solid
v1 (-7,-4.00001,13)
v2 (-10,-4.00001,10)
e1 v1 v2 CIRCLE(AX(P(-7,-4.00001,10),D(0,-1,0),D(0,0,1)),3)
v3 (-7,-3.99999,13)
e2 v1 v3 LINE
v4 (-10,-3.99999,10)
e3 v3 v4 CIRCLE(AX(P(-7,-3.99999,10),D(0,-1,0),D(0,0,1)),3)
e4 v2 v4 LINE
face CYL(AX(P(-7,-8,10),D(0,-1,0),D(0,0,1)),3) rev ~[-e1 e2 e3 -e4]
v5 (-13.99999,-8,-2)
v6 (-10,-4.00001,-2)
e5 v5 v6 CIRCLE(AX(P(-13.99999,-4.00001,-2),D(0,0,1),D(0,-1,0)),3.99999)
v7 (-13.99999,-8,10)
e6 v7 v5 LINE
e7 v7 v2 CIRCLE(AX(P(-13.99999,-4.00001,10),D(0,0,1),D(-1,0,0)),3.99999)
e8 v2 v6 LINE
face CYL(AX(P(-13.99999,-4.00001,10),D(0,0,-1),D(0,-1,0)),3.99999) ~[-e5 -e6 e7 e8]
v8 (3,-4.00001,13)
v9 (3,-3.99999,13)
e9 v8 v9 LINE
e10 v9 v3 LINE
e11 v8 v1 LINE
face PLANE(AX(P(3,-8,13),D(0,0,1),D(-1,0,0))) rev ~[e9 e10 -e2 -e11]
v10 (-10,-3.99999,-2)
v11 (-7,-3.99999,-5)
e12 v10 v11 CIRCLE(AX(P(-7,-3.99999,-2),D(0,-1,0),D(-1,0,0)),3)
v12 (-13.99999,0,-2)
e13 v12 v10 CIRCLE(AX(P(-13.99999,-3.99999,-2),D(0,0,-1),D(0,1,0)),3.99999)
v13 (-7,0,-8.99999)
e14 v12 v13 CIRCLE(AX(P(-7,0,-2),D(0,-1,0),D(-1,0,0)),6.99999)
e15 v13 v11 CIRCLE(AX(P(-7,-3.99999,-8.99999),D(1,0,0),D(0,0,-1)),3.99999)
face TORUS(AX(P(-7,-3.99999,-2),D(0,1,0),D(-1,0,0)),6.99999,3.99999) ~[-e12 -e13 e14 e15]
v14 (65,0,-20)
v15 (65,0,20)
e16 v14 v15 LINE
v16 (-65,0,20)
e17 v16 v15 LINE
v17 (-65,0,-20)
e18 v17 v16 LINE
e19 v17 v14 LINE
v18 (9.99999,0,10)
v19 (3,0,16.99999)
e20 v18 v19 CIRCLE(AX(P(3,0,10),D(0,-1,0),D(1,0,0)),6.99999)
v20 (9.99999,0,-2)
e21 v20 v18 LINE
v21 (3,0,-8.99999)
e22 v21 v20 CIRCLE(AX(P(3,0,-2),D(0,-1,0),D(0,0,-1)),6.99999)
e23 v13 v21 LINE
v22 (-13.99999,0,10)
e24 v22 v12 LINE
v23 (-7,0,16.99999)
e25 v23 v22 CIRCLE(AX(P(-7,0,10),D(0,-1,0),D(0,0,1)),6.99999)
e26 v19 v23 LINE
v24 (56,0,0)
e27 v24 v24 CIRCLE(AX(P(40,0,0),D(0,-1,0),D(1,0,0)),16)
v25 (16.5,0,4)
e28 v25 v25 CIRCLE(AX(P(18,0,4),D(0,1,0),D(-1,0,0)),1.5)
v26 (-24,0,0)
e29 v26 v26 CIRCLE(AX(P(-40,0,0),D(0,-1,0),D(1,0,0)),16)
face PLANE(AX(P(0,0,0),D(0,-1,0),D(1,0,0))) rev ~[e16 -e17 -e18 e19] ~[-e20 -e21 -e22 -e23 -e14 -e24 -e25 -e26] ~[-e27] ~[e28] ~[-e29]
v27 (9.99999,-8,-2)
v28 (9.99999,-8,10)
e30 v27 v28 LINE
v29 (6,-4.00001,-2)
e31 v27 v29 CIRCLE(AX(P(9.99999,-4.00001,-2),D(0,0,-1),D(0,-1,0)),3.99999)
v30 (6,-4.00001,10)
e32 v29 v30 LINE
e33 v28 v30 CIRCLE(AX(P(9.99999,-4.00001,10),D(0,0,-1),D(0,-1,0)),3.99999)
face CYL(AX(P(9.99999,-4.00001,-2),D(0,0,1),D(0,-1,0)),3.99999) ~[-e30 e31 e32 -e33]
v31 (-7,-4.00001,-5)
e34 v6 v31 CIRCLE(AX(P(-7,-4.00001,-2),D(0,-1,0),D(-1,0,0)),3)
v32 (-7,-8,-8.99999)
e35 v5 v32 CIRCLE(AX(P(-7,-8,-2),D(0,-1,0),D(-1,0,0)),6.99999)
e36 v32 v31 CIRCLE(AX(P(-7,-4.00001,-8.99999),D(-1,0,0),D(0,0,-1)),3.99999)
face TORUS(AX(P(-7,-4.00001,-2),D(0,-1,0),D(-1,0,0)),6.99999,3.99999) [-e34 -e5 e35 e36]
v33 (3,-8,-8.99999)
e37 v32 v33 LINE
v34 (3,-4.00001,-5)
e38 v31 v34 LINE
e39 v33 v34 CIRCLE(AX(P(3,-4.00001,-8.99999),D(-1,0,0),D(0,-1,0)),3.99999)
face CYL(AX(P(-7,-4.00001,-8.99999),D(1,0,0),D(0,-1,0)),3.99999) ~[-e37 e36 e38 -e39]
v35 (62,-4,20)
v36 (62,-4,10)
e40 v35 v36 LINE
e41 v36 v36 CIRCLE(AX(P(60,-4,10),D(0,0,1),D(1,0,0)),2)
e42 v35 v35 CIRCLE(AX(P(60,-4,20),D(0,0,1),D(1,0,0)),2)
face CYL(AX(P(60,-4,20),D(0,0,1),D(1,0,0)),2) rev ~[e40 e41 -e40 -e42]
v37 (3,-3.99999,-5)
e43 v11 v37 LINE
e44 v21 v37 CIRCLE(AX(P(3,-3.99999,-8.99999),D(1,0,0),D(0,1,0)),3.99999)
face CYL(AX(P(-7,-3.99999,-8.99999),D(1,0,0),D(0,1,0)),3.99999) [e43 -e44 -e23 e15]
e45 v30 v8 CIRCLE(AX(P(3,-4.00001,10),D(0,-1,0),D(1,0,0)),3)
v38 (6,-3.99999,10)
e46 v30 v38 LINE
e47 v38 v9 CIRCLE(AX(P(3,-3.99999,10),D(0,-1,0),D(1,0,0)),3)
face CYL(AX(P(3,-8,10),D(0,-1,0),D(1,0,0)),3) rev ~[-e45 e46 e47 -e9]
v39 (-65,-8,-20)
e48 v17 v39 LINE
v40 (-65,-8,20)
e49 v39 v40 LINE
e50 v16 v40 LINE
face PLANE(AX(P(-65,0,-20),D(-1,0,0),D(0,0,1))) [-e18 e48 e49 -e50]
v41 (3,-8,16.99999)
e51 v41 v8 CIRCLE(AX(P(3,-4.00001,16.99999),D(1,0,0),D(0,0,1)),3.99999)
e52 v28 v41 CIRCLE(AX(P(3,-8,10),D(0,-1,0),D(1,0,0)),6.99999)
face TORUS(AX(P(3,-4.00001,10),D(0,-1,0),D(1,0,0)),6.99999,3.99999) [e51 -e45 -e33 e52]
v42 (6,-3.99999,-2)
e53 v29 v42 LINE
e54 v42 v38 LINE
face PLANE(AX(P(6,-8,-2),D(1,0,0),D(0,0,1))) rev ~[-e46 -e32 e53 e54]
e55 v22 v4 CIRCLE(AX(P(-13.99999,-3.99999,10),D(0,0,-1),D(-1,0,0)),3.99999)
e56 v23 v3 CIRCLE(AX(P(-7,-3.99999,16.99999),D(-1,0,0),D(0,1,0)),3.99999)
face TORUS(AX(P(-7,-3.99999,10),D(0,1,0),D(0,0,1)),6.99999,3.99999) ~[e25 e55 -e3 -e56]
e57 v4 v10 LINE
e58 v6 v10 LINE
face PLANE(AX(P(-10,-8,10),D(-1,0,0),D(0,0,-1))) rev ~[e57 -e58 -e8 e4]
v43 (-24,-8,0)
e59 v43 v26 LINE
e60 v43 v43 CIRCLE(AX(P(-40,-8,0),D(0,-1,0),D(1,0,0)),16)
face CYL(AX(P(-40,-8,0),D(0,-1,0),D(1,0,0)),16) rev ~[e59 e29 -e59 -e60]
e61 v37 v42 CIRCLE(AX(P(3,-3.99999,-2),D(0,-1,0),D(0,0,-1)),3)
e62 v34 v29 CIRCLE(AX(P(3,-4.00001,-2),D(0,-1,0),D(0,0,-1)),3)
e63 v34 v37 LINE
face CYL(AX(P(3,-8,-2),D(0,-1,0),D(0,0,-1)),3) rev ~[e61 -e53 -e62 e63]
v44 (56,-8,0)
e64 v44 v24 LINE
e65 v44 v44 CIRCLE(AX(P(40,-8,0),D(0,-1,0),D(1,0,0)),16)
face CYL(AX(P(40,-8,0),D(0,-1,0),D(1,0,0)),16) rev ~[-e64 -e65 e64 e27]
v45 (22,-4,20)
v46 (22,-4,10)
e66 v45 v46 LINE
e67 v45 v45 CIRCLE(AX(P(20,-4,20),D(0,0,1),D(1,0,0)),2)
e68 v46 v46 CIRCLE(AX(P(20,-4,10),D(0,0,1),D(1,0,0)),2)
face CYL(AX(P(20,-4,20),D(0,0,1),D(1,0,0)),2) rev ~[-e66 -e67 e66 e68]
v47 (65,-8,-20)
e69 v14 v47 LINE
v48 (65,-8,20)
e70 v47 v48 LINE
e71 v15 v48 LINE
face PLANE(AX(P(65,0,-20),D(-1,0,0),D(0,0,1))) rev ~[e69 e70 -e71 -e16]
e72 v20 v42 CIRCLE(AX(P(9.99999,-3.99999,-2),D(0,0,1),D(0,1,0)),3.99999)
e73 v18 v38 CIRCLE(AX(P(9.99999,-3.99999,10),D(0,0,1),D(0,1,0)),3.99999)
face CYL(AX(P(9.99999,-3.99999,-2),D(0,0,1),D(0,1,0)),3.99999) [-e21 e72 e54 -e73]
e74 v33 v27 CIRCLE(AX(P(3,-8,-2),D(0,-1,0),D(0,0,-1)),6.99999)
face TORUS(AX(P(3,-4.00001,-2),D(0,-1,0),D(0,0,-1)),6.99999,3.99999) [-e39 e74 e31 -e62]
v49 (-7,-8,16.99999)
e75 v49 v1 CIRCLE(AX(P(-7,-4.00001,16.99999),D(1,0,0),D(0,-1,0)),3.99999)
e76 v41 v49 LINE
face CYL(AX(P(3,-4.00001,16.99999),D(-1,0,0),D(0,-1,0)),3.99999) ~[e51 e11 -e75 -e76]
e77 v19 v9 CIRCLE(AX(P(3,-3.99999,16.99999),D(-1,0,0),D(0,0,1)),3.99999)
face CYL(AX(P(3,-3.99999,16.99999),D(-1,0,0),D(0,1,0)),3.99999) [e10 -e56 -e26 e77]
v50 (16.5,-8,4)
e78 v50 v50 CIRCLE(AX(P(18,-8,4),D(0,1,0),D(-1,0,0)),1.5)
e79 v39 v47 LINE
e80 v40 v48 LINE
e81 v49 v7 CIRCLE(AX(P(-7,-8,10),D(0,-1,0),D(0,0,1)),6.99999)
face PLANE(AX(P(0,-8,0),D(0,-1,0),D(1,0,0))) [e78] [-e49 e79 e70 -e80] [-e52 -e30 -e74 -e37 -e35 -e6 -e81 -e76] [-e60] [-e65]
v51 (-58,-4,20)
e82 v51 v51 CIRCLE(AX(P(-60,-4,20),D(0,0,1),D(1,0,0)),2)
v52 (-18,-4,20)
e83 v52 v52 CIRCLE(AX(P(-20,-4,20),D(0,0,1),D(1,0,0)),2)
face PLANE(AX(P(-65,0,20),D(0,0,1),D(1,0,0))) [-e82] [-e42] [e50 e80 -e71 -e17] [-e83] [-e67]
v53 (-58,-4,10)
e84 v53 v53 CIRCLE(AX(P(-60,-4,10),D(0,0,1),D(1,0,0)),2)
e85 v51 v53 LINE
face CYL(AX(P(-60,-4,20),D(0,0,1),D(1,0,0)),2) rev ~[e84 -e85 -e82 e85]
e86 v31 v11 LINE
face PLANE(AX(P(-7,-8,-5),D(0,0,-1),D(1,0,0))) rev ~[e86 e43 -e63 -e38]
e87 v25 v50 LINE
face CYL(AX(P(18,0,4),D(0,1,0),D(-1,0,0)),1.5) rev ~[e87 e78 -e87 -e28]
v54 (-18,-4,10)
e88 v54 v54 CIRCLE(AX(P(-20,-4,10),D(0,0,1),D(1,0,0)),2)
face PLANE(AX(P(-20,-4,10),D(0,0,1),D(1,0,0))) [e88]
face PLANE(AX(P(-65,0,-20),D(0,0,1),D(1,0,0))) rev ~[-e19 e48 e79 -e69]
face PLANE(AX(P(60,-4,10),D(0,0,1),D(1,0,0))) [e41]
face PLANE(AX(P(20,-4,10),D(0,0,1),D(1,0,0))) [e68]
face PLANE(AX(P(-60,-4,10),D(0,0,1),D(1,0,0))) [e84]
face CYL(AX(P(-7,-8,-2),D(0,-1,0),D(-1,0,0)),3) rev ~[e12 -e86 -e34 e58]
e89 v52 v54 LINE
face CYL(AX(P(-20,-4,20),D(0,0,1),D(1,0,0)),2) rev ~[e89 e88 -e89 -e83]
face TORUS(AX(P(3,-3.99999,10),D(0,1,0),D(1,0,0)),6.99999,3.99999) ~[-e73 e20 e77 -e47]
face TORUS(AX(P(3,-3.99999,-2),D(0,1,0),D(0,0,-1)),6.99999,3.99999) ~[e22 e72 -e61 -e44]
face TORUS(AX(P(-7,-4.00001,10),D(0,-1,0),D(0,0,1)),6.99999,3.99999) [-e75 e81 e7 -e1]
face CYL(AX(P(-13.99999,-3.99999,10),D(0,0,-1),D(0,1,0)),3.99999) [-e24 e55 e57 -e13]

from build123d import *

# Parameters (mm, degrees)
F0_W      = 130
F0_H      = 40
F1_DEPTH  = 8
F2_R      = 16
F3_DEPTH  = 8.001
F4_R      = 2
F5_DEPTH  = 10
F7_DEPTH  = 25
F8_R      = 3.99999
F9_R      = 1.5
F10_DEPTH = 25


# Not quite as in the source:
# - a fillet or chamfer is up to 0.001 mm smaller than in the source, because OpenCascade refuses the exact size


with BuildPart() as f1:
    # F0 (on Front) → F1 (new body)
    with BuildSketch(Plane.XZ):
        Rectangle(F0_W, F0_H)
    extrude(amount=F1_DEPTH)

    # F2 (on face) → F3 (cut, through all)
    with BuildSketch(Plane.XZ.offset(8)):
        with Locations((40, 0)):
            Circle(F2_R)
        with Locations((-40, 0)):
            Circle(F2_R)
    extrude(amount=-F3_DEPTH, mode=Mode.SUBTRACT)

    # F4 (on face) → F5 (cut)
    with BuildSketch(Plane.XY.offset(20)):
        with Locations((-60, -4)):
            Circle(F4_R)
        with Locations((60, -4)):
            Circle(F4_R)
        with Locations((-20, -4)):
            Circle(F4_R)
        with Locations((20, -4)):
            Circle(F4_R)
    extrude(amount=-F5_DEPTH, mode=Mode.SUBTRACT)

    # F6 (on face) → F7 (cut)
    with BuildSketch(Plane.XZ.offset(8)):
        with BuildLine():
            Line((3, 13), (-7, 13))
            ThreePointArc((-7, 13), (-9.1213203436, 12.1213203436), (-10, 10))
            Line((-10, 10), (-10, -2))
            ThreePointArc((-10, -2), (-9.1213203436, -4.1213203436), (-7, -5))
            Line((-7, -5), (3, -5))
            ThreePointArc((3, -5), (5.1213203436, -4.1213203436), (6, -2))
            Line((6, -2), (6, 10))
            ThreePointArc((6, 10), (5.1213203436, 12.1213203436), (3, 13))
        make_face()
    extrude(amount=-F7_DEPTH, mode=Mode.SUBTRACT)

    # F8 (radius 4 in the source; OpenCascade refuses exactly that, so slightly less here)
    f8_edges = [f1.edges().sort_by_distance(p)[0] for p in [
        (6, -8, 4),
        (6, 0, 4),
    ]]
    fillet(f8_edges, radius=F8_R)

    # F9 (on face) → F10 (cut)
    with BuildSketch(Plane(origin=(0, 0, 0), x_dir=(-1, 0, 0), z_dir=(0, 1, 0))):
        with Locations((-18, 4)):
            Circle(F9_R)
    extrude(amount=-F10_DEPTH, mode=Mode.SUBTRACT)


solid = f1.part
